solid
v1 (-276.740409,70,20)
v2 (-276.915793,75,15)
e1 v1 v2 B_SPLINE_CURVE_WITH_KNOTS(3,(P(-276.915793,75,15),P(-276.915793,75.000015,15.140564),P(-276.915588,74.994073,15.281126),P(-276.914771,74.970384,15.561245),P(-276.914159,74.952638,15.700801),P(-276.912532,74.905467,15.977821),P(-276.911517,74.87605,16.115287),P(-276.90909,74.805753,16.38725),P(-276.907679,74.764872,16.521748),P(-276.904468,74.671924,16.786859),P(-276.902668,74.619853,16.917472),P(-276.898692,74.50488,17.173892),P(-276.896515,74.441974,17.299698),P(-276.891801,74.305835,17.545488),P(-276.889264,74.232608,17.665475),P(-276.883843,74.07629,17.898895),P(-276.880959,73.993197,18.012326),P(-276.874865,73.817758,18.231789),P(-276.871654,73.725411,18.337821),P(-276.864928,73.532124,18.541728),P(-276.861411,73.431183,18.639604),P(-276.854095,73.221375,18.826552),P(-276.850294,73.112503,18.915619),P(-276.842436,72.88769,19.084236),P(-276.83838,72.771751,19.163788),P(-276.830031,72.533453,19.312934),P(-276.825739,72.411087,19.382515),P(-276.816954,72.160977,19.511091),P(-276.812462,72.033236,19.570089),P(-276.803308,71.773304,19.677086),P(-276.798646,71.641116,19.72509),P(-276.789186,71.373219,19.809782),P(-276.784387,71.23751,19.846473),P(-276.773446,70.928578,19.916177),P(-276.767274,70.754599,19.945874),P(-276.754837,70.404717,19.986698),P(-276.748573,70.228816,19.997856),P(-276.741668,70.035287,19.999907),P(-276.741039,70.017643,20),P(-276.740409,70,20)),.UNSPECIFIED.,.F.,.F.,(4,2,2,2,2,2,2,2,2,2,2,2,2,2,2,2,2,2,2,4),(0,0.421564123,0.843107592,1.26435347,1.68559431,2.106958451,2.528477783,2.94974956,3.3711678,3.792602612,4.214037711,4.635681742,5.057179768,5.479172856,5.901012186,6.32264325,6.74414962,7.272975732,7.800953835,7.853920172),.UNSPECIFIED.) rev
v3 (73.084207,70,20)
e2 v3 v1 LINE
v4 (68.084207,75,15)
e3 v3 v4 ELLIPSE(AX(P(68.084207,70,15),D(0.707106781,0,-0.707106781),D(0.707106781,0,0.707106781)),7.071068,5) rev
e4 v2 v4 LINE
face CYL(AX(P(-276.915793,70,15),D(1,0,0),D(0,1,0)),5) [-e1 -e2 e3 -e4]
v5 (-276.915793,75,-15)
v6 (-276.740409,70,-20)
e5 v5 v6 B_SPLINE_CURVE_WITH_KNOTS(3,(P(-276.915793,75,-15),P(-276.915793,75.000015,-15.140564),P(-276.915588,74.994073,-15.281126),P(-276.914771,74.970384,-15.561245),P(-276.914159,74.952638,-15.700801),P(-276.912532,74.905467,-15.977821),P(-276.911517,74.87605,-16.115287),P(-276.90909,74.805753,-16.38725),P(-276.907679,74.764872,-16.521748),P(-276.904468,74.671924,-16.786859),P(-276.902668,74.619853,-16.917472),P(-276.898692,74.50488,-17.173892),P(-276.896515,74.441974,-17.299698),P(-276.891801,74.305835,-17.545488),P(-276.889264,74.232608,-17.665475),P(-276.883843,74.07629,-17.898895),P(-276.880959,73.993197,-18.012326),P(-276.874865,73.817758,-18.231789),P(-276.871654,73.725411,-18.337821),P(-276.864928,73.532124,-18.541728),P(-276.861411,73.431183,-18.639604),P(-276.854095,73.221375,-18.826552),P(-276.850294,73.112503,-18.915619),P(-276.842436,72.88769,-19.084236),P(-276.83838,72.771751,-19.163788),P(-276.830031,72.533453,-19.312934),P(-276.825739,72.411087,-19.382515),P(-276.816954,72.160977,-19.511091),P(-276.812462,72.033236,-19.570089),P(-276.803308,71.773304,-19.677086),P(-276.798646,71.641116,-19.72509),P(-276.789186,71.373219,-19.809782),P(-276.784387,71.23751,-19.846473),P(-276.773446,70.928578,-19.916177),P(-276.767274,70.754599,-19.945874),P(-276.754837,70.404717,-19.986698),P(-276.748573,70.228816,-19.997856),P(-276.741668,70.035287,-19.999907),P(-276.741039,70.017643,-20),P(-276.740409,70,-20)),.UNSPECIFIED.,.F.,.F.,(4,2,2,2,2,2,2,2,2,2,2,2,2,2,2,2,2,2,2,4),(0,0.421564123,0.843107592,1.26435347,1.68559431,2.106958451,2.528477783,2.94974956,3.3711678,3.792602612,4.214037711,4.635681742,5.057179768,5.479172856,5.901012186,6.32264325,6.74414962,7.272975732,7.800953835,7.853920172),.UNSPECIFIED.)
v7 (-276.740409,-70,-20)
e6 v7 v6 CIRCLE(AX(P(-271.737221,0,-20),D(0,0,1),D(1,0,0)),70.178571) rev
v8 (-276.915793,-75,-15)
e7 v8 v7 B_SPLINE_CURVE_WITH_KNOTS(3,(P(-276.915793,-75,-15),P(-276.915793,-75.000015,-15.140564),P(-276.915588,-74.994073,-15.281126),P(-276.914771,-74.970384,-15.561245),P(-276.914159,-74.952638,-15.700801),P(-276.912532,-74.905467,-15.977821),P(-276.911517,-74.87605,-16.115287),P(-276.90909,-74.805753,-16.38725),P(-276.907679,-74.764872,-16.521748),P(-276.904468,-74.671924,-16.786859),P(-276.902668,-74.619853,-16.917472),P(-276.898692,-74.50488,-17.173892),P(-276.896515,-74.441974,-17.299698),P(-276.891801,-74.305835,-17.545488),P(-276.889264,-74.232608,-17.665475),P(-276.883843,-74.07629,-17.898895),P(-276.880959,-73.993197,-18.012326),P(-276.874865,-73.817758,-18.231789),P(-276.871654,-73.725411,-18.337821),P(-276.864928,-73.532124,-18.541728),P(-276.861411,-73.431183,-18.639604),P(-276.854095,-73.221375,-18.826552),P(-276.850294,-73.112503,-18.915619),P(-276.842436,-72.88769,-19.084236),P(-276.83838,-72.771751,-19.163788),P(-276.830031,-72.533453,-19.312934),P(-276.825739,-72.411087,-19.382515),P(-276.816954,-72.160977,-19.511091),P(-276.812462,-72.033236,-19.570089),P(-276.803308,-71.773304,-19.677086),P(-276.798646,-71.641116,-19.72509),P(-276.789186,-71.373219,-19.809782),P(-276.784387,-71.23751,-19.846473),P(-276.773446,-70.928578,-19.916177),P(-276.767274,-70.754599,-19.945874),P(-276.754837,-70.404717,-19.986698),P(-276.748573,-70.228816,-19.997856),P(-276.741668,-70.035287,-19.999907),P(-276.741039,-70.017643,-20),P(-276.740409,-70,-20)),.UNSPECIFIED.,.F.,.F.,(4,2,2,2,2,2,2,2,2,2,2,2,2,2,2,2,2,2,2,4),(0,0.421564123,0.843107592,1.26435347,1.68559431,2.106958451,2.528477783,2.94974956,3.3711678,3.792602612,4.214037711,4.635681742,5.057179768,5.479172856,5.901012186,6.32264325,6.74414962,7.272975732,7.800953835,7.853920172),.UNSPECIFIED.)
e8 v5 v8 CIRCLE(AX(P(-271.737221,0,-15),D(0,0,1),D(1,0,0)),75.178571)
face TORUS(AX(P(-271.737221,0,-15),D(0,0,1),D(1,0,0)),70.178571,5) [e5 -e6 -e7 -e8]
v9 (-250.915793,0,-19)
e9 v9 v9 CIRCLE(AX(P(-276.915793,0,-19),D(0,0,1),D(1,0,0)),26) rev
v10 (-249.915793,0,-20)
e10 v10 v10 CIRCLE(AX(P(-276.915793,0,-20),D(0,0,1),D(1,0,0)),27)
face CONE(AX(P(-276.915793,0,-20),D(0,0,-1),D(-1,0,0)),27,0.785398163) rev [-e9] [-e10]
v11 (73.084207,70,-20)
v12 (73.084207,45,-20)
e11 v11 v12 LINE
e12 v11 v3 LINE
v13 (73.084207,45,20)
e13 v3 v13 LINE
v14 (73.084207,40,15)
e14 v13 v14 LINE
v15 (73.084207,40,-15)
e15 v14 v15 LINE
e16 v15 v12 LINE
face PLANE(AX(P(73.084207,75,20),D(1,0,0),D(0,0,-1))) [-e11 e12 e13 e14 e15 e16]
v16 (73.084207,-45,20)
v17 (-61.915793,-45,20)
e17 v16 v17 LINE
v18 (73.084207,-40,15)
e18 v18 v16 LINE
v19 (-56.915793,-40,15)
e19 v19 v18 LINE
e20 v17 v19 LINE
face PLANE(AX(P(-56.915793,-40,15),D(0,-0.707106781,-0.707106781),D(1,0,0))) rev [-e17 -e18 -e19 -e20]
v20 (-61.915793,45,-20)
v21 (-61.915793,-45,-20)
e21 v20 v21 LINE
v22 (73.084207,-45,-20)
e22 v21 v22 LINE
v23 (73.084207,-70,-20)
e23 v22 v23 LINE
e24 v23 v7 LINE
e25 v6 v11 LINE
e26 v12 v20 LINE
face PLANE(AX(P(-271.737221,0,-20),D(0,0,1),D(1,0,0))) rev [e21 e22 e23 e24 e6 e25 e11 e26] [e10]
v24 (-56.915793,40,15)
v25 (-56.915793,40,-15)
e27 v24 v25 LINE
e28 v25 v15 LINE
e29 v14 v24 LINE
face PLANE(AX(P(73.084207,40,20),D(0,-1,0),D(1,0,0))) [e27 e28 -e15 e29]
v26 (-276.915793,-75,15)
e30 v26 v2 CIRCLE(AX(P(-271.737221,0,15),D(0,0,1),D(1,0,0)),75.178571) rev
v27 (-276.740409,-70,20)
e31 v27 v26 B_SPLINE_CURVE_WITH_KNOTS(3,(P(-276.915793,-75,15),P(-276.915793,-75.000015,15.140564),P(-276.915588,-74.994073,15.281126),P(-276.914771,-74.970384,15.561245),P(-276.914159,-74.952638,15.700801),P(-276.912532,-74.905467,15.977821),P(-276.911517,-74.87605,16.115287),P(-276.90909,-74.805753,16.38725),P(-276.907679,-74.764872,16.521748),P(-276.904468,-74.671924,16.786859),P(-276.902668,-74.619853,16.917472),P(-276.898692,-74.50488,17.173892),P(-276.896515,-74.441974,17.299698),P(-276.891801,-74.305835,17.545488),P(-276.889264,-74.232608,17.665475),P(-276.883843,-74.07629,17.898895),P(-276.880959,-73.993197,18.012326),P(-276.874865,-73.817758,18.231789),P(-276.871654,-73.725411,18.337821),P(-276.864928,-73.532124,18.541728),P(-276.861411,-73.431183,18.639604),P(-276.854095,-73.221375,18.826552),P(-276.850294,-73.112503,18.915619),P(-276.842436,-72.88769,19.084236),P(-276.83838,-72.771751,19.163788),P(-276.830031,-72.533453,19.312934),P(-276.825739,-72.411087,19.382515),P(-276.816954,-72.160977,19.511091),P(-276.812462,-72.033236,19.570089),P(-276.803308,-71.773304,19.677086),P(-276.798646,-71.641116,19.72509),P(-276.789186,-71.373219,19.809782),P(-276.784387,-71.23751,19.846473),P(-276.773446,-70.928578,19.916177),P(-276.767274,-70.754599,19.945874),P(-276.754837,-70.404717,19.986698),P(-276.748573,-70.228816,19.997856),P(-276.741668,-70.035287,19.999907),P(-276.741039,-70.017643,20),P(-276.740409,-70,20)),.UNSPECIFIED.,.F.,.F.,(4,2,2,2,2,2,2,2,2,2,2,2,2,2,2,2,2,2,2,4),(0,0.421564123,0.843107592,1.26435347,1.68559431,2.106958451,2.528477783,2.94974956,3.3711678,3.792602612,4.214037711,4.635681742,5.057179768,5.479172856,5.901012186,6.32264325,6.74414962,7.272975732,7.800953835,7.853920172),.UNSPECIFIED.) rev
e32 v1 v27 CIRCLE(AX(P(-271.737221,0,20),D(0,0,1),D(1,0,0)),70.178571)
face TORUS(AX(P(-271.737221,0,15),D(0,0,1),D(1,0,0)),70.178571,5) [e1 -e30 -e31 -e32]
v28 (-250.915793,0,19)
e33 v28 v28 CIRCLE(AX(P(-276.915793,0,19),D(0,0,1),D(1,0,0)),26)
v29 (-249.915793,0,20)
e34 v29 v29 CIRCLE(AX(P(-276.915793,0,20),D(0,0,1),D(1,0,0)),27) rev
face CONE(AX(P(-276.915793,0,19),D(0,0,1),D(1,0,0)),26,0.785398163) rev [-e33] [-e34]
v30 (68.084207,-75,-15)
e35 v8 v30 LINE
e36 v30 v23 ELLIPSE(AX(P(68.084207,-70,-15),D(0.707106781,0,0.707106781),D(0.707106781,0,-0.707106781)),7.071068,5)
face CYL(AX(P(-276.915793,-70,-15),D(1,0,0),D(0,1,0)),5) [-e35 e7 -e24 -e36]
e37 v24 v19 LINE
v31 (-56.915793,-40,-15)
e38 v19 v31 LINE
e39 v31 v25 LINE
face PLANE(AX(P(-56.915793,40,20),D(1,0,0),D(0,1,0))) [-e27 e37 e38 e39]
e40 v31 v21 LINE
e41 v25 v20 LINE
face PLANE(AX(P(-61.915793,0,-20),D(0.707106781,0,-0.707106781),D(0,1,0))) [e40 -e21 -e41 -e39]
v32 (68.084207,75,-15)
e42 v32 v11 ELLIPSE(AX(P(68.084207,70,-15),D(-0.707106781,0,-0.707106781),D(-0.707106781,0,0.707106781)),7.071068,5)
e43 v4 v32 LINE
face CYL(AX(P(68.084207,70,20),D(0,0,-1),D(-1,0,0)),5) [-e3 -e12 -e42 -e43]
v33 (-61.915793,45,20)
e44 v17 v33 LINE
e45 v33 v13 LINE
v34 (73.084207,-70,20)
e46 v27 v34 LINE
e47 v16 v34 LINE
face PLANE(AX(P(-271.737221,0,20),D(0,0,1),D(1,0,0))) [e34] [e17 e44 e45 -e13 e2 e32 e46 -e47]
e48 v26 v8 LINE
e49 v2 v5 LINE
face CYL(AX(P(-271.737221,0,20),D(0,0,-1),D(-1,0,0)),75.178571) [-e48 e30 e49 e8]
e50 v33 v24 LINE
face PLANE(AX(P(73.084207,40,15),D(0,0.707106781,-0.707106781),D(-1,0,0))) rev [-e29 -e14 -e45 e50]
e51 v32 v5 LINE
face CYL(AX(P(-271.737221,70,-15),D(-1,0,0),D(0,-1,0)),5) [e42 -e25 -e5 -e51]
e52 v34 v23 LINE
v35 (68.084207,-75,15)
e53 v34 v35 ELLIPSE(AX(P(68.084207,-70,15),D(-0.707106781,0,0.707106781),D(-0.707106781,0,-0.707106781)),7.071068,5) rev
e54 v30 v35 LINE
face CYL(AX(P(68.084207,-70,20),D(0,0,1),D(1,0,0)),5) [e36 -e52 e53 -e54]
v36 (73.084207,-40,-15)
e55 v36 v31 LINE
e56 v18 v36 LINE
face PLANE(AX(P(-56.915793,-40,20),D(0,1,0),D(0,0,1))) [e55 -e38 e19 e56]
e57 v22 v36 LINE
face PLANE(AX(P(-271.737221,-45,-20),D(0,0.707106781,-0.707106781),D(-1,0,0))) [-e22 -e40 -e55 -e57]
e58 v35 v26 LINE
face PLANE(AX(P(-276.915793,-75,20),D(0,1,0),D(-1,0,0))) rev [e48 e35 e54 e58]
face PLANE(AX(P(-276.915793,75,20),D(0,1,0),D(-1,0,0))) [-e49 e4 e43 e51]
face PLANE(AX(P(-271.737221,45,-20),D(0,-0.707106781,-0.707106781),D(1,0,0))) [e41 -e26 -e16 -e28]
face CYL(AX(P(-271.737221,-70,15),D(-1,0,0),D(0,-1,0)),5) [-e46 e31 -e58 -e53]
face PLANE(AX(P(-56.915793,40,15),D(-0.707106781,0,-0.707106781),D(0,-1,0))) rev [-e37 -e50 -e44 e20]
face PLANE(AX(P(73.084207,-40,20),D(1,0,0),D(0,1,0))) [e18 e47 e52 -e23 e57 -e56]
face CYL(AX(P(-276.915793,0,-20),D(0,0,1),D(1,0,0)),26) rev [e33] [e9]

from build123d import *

# Parameters (mm, degrees)
BOSS_EXTRUDE1_DEPTH = 20
SKETCH2_R           = 26
CUT_EXTRUDE1_DEPTH  = 40
FILLET1_R           = 5
CHAMFER1_SIZE       = 1
CHAMFER2_SIZE       = 5


with BuildPart() as part:
    # Sketch1 → Boss-Extrude1 (new, symmetric)
    with BuildSketch(Plane.XY):
        with BuildLine():
            Line((-276.915792692, 75), (73.084207308, 75))
            Line((73.084207308, 75), (73.084207308, 40))
            Line((73.084207308, 40), (-56.915792692, 40))
            Line((-56.915792692, 40), (-56.915792692, -40))
            Line((-56.915792692, -40), (73.084207308, -40))
            Line((73.084207308, -40), (73.084207308, -75))
            Line((73.084207308, -75), (-276.915792692, -75))
            ThreePointArc((-276.915792692, -75), (-346.915792692, 0), (-276.915792692, 75))
        make_face()
    extrude(amount=BOSS_EXTRUDE1_DEPTH, both=True)

    # Sketch2 → Cut-Extrude1 (cut)
    with BuildSketch(Plane.XY.offset(20)):
        with Locations((-276.915792692, 0)):
            Circle(SKETCH2_R)
    extrude(amount=-CUT_EXTRUDE1_DEPTH, mode=Mode.SUBTRACT)

    # Fillet1
    # the kernel refuses this fillet: 5 mm, written as the material it takes off along each edge
    with BuildSketch(Plane(origin=(78.084207308, -75, -20), x_dir=(0, 1, 0), z_dir=(-1, 0, 0)), Plane(origin=(-281.915792692, 75, 20), x_dir=(0, 0, -1), z_dir=(1, 0, 0))) as fillet1_piece_1:
        with BuildLine():
            CenterArc((FILLET1_R, -FILLET1_R), FILLET1_R, 90, 90)
            Line((0, -FILLET1_R), (-FILLET1_R * 0.02, -FILLET1_R))
            Line((-FILLET1_R * 0.02, -FILLET1_R), (-FILLET1_R * 0.02, FILLET1_R * 0.02))
            Line((-FILLET1_R * 0.02, FILLET1_R * 0.02), (FILLET1_R, FILLET1_R * 0.02))
            Line((FILLET1_R, FILLET1_R * 0.02), (FILLET1_R, 0))
        make_face()
    extrude(amount=360, mode=Mode.SUBTRACT)
    with BuildSketch(Plane(origin=(-271.737221263, 0, -20), x_dir=(-0.00233212005306246, -0.9999972806043315, 0), z_dir=(0.9999972806043315, -0.00233212005306246, 0))) as fillet1_piece_2:
        with BuildLine():
            CenterArc((75.178571429 - FILLET1_R, -FILLET1_R), FILLET1_R, 0, 90)
            Line((75.178571429 - FILLET1_R, 0), (75.178571429 - FILLET1_R, FILLET1_R * 0.02))
            Line((75.178571429 - FILLET1_R, FILLET1_R * 0.02), (75.178571429 + FILLET1_R * 0.02, FILLET1_R * 0.02))
            Line((75.178571429 + FILLET1_R * 0.02, FILLET1_R * 0.02), (75.178571429 + FILLET1_R * 0.02, -FILLET1_R))
            Line((75.178571429 + FILLET1_R * 0.02, -FILLET1_R), (75.178571429, -FILLET1_R))
        make_face()
    revolve(axis=Axis((-271.737221263, 0, -20), (0, 0, -1)), revolution_arc=179.732758485, mode=Mode.SUBTRACT)
    with BuildSketch(Plane(origin=(73.084207308, 75, 25), x_dir=(-1, 0, 0), z_dir=(0, 0, -1)), Plane(origin=(73.084207308, -75, -25), x_dir=(-1, 0, 0), z_dir=(0, 0, 1))) as fillet1_piece_3:
        with BuildLine():
            CenterArc((FILLET1_R, -FILLET1_R), FILLET1_R, 90, 90)
            Line((0, -FILLET1_R), (-FILLET1_R * 0.02, -FILLET1_R))
            Line((-FILLET1_R * 0.02, -FILLET1_R), (-FILLET1_R * 0.02, FILLET1_R * 0.02))
            Line((-FILLET1_R * 0.02, FILLET1_R * 0.02), (FILLET1_R, FILLET1_R * 0.02))
            Line((FILLET1_R, FILLET1_R * 0.02), (FILLET1_R, 0))
        make_face()
    extrude(amount=50, mode=Mode.SUBTRACT)
    with BuildSketch(Plane(origin=(-271.737221263, 0, 20), x_dir=(-0.00233212005306246, -0.9999972806043315, 0), z_dir=(0.9999972806043315, -0.00233212005306246, 0))) as fillet1_piece_4:
        with BuildLine():
            CenterArc((75.178571429 - FILLET1_R, FILLET1_R), FILLET1_R, 270, 90)
            Line((75.178571429 - FILLET1_R, 0), (75.178571429 - FILLET1_R, -FILLET1_R * 0.02))
            Line((75.178571429 - FILLET1_R, -FILLET1_R * 0.02), (75.178571429 + FILLET1_R * 0.02, -FILLET1_R * 0.02))
            Line((75.178571429 + FILLET1_R * 0.02, -FILLET1_R * 0.02), (75.178571429 + FILLET1_R * 0.02, FILLET1_R))
            Line((75.178571429 + FILLET1_R * 0.02, FILLET1_R), (75.178571429, FILLET1_R))
        make_face()
    revolve(axis=Axis((-271.737221263, 0, 20), (0, 0, -1)), revolution_arc=179.732758485, mode=Mode.SUBTRACT)
    with BuildSketch(Plane(origin=(78.084207308, -75, 20), x_dir=(0, 1, 0), z_dir=(-1, 0, 0)), Plane(origin=(-281.915792692, 75, -20), x_dir=(0, 0, 1), z_dir=(1, 0, 0))) as fillet1_piece_5:
        with BuildLine():
            CenterArc((FILLET1_R, FILLET1_R), FILLET1_R, 180, 90)
            Line((0, FILLET1_R), (-FILLET1_R * 0.02, FILLET1_R))
            Line((-FILLET1_R * 0.02, FILLET1_R), (-FILLET1_R * 0.02, -FILLET1_R * 0.02))
            Line((-FILLET1_R * 0.02, -FILLET1_R * 0.02), (FILLET1_R, -FILLET1_R * 0.02))
            Line((FILLET1_R, -FILLET1_R * 0.02), (FILLET1_R, 0))
        make_face()
    extrude(amount=360, mode=Mode.SUBTRACT)

    # Chamfer1
    chamfer1_edges = [part.edges().sort_by_distance(p)[0] for p in [
        (-302.915792692, 0, -20),
        (-302.915792692, 0, 20),
    ]]
    chamfer(chamfer1_edges, length=CHAMFER1_SIZE)

    # Chamfer2
    chamfer2_edges = [part.edges().sort_by_distance(p)[0] for p in [
        (8.084207308, -40, 20),
        (-56.915792692, 0, 20),
        (8.084207308, 40, 20),
        (8.084207308, 40, -20),
        (-56.915792692, 0, -20),
        (8.084207308, -40, -20),
    ]]
    chamfer(chamfer2_edges, length=CHAMFER2_SIZE)


solid = part.part
